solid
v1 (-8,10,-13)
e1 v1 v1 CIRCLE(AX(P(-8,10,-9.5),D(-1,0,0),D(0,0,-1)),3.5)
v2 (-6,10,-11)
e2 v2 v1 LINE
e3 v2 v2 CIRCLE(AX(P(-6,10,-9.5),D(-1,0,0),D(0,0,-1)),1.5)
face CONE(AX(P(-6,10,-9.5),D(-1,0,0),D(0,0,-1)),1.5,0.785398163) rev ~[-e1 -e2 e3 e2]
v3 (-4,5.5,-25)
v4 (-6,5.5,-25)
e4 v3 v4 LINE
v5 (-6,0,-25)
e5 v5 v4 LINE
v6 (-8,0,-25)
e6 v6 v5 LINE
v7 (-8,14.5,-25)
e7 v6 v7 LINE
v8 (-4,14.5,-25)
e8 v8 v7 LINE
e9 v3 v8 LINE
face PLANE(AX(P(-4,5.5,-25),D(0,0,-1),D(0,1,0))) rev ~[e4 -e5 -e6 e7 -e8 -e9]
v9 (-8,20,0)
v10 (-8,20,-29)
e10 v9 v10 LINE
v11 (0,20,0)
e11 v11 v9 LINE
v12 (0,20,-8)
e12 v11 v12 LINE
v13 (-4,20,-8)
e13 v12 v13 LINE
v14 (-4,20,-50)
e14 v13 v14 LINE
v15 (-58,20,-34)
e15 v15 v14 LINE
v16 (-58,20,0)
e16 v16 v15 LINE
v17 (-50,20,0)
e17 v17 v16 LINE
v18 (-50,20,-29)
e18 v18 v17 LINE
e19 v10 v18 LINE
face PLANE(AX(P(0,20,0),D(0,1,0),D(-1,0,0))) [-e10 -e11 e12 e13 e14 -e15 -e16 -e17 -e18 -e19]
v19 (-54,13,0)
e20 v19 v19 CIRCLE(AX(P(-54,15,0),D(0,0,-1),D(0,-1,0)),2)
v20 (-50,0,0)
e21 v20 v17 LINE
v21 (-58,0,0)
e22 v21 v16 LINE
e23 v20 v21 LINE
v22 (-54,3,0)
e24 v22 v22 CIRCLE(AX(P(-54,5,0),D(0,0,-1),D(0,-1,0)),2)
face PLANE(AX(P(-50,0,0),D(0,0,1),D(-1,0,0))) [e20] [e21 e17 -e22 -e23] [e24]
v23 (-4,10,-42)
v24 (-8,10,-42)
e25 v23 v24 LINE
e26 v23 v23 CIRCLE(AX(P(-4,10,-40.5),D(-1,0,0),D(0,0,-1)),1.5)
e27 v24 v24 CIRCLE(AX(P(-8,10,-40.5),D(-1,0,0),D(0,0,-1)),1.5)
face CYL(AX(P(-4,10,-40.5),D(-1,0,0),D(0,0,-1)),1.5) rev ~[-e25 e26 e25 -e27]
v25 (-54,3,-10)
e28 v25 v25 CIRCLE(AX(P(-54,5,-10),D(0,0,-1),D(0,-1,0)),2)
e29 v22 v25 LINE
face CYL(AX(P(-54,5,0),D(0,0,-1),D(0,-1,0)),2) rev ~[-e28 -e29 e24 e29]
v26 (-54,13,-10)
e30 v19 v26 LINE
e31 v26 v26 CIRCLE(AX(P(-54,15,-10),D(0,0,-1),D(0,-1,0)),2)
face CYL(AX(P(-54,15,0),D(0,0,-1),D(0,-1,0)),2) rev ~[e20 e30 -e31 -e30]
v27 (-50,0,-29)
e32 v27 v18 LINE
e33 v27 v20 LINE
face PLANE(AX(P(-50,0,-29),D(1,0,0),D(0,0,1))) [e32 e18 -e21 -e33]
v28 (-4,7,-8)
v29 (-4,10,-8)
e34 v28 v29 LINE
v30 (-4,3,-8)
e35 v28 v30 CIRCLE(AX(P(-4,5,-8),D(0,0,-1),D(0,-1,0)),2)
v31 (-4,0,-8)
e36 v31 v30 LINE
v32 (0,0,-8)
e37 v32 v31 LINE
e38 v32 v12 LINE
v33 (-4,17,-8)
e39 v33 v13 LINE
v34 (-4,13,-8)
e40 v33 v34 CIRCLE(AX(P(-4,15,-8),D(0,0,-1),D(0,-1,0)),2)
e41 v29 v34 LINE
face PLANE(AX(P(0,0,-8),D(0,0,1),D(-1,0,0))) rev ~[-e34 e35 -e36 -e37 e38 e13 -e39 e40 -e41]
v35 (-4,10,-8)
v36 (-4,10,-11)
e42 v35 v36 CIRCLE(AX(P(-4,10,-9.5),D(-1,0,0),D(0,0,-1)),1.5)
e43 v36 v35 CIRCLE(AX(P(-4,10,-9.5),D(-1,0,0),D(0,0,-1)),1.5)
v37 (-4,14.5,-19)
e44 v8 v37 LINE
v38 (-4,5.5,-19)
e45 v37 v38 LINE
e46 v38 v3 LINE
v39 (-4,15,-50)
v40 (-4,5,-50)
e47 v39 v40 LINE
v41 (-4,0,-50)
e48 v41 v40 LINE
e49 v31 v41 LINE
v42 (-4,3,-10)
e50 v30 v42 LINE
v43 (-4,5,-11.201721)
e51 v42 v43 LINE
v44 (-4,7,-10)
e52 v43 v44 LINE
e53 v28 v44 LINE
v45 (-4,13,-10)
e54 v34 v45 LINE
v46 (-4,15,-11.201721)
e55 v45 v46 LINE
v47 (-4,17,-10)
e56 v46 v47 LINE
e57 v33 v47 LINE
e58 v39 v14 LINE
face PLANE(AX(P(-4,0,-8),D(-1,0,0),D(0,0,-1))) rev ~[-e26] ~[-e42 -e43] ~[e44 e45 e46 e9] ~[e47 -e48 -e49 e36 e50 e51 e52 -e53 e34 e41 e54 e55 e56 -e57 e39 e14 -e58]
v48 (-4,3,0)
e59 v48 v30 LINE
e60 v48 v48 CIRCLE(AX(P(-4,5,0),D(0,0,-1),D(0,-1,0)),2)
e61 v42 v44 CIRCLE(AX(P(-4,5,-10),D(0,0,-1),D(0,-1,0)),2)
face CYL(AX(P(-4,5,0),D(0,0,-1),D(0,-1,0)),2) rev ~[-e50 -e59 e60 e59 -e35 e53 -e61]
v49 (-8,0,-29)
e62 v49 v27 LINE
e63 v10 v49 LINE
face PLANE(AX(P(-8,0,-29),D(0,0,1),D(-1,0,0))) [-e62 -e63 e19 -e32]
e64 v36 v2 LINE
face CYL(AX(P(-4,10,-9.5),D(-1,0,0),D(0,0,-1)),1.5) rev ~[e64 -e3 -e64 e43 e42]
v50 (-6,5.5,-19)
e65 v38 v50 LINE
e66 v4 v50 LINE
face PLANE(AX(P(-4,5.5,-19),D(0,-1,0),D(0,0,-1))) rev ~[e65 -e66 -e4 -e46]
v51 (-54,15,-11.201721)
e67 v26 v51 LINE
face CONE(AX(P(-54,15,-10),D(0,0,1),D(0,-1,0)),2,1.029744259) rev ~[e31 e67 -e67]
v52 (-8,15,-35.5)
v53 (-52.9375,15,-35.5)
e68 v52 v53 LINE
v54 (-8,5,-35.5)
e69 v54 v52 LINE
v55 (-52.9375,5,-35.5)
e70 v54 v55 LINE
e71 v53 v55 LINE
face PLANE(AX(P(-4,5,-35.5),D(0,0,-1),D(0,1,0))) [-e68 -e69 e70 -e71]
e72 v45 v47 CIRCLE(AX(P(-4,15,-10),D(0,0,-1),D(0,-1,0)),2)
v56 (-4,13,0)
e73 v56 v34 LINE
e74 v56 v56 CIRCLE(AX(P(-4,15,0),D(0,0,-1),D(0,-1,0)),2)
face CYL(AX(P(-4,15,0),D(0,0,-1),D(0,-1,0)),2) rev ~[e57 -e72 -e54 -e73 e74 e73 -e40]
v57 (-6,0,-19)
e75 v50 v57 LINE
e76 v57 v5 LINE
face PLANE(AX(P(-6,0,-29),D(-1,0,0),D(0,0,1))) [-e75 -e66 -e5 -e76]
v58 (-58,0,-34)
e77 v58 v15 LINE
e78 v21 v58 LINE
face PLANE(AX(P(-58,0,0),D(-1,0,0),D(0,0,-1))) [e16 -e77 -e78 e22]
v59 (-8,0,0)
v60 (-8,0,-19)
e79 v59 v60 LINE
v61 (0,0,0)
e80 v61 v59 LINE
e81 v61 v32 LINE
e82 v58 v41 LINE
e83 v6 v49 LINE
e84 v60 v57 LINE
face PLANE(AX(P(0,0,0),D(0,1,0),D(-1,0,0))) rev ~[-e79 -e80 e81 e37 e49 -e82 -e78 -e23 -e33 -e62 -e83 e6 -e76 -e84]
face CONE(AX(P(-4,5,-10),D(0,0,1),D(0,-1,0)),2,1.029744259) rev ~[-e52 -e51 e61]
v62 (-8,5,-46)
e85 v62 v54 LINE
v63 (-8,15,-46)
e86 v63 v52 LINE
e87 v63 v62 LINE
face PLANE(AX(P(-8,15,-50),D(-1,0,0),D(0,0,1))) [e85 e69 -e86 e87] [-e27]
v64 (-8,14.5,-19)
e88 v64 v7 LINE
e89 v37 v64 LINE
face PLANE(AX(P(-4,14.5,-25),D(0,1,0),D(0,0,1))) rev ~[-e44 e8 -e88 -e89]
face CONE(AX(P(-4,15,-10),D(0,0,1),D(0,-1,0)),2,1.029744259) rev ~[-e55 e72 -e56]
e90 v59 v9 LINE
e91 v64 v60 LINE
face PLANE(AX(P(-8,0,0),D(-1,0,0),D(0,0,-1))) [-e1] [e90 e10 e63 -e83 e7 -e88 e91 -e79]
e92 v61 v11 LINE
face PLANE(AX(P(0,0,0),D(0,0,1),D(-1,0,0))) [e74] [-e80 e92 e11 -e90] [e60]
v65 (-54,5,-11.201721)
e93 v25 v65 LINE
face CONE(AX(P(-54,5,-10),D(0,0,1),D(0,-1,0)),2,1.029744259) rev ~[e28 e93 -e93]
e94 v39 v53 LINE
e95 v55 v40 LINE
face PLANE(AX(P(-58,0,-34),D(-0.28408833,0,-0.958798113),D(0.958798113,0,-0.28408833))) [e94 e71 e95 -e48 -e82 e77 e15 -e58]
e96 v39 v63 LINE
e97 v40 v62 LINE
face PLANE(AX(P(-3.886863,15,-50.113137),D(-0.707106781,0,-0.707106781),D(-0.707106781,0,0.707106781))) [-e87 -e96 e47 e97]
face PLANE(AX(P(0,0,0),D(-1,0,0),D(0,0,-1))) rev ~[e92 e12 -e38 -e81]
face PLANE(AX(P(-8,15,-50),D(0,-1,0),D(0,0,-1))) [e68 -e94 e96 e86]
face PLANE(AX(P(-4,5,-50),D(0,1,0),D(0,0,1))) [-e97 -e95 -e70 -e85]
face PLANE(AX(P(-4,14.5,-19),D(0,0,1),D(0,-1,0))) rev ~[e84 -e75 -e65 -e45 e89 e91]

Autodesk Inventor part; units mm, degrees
ref_plane "YZ Plane" through (0, 0, 0) normal (1, 0, 0) x (0, 1, 0)
ref_plane "XZ Plane" through (0, 0, 0) normal (0, 1, 0) x (-1, 0, 0)
ref_plane "XY Plane" through (0, 0, 0) normal (0, 0, 1) x (1, 0, 0)
sketch "Esquisse1" plane through (0, 0, 0) normal (0, 1, 0) x (-1, 0, 0)
  line L0 (0, 0) -> (0, -8)
  line L1 (0, 0) -> (8, 0)
  line L2 (8, 0) -> (8, -29)
  line L3 (8, -29) -> (50, -29)
  line L4 (50, -29) -> (50, 0)
  line L5 (0, -8) -> (4, -8)
  line L6 (4, -8) -> (4, -50)
  line L7 (50, 0) -> (58, 0)
  line L8 (58, 0) -> (58, -34)
  line L9 (58, -34) -> (4, -50)
  dimension "d0" = 8
  dimension "d1" = 29
  dimension "d2" = 42
  dimension "d3" = 8
  dimension "d4" = 42
  dimension "d5" = 8
  dimension "d6" = 34
  dimension "d11" = 4
  dimension "d12" = 29
extrude "Extrusion1" add sketch "Esquisse1" along normal blind 20
sketch "Esquisse2" plane through (-58, 0, 0) normal (0, 0, 1) x (1, 0, 0)
  line L0 (0, 20) -> (8, 20) projected
  line L1 (0, 0) -> (8, 0) projected
  line L2 (0, 0) -> (0, 20) projected
  point P0 (58, 0)
  point P1 (4, 15)
  point P2 (4, 5)
  dimension "d15" = 10
  dimension "d17" = 5
  dimension "d18" = 4
  dimension "d19" = 4
hole "Perçage1" at (-54, 15, 0) at (-54, 5, 0) direction (0, 0, -1) diameter 4 depth 10 tip angle 118
sketch "Esquisse3" plane through (-8, 0, 0) normal (0, 0, 1) x (1, 0, 0)
  line L0 (0, 20) -> (8, 20) projected
  line L1 (8, 0) -> (8, 20) projected
  point P0 (4, 15)
  point P1 (4, 5)
  dimension "d27" = 10
  dimension "d28" = 5
  dimension "d29" = 4
  dimension "d30" = 4
hole "Perçage2" at (-4, 15, 0) at (-4, 5, 0) direction (0, 0, -1) diameter 4 depth 10 tip angle 118
sketch "Esquisse4" plane through (-4, 0, -8) normal (1, 0, 0) x (0, 0, -1)
  line L0 (42, 5) -> (27.5, 5)
  line L1 (27.5, 5) -> (27.5, 15)
  line L2 (27.5, 15) -> (42, 15)
  line L3 (42, 15) -> (42, 5)
  line L4 (0, 0) -> (42, 0) projected
  line L5 (42, 0) -> (42, 20) projected
  point P0 (-8, 0)
  dimension "d38" = 10
  dimension "d39" = 14.5
  dimension "d40" = 5
  dimension "d41" = 0
extrude "Extrusion2" cut sketch "Esquisse4" against normal blind 100
sketch "Esquisse5" plane through (-4, 15, -50) normal (0, -1, 0) x (1, 0, 0)
  line L0 (0, 42) -> (0, 0) projected
  line L1 (-4, 21) -> (0, 21)
  line L2 (0, 21) -> (0, 0)
  line L3 (0, 0) -> (-4, 0)
  line L4 (-4, 0) -> (-4, 21)
  point P0 (4, 50)
extrude "Extrusion3" add sketch "Esquisse5" along normal blind 10
sketch "Esquisse6" plane through (-4, 0, -8) normal (1, 0, 0) x (0, 0, -1)
  line L0 (11, 5.5) -> (17, 5.5)
  line L1 (17, 5.5) -> (17, 14.5)
  line L2 (17, 14.5) -> (11, 14.5)
  line L3 (11, 14.5) -> (11, 5.5)
  line L4 (-8, 0) -> (-8, 20) projected
  line L5 (21, 20) -> (-8, 20) projected
  dimension "d49" = 19
  dimension "d50" = 25
  dimension "d51" = 9
  dimension "d52" = 5.5
extrude "Extrusion4" cut sketch "Esquisse6" against normal blind 10
sketch "Esquisse7" plane through (-4, 0, -8) normal (1, 0, 0) x (0, 0, -1)
  line L0 (-8, 0) -> (-8, 20) projected
  line L1 (42, 15) -> (42, 5) projected
  line L2 (21, 0) -> (-8, 0) projected
  line L3 (42, 0) -> (26, 0) projected
  point P0 (1.5, 10)
  point P1 (32.5, 10)
  dimension "d55" = 9.5
  dimension "d56" = 9.5
  dimension "d57" = 10
  dimension "d58" = 10
hole "Perçage3" at (-4, 10, -9.5) at (-4, 10, -40.5) direction (-1, 0, 0) diameter 3 depth 20 tip angle 118
chamfer "Chanfrein2" distance 2 angle 45 1 edges at (-8, 10, -8)
sketch "Esquisse8" plane through (-8, 0, -29) normal (-1, 0, 0) x (0, 0, 1)
  line L0 (4, 14.5) -> (4, 5.5) projected
  line L1 (21, 0) -> (-21, 0) projected
  line L2 (4, 5.5) -> (10, 5.5)
  line L3 (10, 5.5) -> (10, 0)
  line L4 (10, 0) -> (4, 0)
  line L5 (4, 0) -> (4, 5.5)
  point P0 (29, 0)
  dimension "d69" = 6
extrude "Extrusion5" cut sketch "Esquisse8" against normal blind 2
chamfer "Chanfrein3" distance 4 angle 45 1 edges at (-8, 10, -50)
properties part number "supportservopetitrobot"
